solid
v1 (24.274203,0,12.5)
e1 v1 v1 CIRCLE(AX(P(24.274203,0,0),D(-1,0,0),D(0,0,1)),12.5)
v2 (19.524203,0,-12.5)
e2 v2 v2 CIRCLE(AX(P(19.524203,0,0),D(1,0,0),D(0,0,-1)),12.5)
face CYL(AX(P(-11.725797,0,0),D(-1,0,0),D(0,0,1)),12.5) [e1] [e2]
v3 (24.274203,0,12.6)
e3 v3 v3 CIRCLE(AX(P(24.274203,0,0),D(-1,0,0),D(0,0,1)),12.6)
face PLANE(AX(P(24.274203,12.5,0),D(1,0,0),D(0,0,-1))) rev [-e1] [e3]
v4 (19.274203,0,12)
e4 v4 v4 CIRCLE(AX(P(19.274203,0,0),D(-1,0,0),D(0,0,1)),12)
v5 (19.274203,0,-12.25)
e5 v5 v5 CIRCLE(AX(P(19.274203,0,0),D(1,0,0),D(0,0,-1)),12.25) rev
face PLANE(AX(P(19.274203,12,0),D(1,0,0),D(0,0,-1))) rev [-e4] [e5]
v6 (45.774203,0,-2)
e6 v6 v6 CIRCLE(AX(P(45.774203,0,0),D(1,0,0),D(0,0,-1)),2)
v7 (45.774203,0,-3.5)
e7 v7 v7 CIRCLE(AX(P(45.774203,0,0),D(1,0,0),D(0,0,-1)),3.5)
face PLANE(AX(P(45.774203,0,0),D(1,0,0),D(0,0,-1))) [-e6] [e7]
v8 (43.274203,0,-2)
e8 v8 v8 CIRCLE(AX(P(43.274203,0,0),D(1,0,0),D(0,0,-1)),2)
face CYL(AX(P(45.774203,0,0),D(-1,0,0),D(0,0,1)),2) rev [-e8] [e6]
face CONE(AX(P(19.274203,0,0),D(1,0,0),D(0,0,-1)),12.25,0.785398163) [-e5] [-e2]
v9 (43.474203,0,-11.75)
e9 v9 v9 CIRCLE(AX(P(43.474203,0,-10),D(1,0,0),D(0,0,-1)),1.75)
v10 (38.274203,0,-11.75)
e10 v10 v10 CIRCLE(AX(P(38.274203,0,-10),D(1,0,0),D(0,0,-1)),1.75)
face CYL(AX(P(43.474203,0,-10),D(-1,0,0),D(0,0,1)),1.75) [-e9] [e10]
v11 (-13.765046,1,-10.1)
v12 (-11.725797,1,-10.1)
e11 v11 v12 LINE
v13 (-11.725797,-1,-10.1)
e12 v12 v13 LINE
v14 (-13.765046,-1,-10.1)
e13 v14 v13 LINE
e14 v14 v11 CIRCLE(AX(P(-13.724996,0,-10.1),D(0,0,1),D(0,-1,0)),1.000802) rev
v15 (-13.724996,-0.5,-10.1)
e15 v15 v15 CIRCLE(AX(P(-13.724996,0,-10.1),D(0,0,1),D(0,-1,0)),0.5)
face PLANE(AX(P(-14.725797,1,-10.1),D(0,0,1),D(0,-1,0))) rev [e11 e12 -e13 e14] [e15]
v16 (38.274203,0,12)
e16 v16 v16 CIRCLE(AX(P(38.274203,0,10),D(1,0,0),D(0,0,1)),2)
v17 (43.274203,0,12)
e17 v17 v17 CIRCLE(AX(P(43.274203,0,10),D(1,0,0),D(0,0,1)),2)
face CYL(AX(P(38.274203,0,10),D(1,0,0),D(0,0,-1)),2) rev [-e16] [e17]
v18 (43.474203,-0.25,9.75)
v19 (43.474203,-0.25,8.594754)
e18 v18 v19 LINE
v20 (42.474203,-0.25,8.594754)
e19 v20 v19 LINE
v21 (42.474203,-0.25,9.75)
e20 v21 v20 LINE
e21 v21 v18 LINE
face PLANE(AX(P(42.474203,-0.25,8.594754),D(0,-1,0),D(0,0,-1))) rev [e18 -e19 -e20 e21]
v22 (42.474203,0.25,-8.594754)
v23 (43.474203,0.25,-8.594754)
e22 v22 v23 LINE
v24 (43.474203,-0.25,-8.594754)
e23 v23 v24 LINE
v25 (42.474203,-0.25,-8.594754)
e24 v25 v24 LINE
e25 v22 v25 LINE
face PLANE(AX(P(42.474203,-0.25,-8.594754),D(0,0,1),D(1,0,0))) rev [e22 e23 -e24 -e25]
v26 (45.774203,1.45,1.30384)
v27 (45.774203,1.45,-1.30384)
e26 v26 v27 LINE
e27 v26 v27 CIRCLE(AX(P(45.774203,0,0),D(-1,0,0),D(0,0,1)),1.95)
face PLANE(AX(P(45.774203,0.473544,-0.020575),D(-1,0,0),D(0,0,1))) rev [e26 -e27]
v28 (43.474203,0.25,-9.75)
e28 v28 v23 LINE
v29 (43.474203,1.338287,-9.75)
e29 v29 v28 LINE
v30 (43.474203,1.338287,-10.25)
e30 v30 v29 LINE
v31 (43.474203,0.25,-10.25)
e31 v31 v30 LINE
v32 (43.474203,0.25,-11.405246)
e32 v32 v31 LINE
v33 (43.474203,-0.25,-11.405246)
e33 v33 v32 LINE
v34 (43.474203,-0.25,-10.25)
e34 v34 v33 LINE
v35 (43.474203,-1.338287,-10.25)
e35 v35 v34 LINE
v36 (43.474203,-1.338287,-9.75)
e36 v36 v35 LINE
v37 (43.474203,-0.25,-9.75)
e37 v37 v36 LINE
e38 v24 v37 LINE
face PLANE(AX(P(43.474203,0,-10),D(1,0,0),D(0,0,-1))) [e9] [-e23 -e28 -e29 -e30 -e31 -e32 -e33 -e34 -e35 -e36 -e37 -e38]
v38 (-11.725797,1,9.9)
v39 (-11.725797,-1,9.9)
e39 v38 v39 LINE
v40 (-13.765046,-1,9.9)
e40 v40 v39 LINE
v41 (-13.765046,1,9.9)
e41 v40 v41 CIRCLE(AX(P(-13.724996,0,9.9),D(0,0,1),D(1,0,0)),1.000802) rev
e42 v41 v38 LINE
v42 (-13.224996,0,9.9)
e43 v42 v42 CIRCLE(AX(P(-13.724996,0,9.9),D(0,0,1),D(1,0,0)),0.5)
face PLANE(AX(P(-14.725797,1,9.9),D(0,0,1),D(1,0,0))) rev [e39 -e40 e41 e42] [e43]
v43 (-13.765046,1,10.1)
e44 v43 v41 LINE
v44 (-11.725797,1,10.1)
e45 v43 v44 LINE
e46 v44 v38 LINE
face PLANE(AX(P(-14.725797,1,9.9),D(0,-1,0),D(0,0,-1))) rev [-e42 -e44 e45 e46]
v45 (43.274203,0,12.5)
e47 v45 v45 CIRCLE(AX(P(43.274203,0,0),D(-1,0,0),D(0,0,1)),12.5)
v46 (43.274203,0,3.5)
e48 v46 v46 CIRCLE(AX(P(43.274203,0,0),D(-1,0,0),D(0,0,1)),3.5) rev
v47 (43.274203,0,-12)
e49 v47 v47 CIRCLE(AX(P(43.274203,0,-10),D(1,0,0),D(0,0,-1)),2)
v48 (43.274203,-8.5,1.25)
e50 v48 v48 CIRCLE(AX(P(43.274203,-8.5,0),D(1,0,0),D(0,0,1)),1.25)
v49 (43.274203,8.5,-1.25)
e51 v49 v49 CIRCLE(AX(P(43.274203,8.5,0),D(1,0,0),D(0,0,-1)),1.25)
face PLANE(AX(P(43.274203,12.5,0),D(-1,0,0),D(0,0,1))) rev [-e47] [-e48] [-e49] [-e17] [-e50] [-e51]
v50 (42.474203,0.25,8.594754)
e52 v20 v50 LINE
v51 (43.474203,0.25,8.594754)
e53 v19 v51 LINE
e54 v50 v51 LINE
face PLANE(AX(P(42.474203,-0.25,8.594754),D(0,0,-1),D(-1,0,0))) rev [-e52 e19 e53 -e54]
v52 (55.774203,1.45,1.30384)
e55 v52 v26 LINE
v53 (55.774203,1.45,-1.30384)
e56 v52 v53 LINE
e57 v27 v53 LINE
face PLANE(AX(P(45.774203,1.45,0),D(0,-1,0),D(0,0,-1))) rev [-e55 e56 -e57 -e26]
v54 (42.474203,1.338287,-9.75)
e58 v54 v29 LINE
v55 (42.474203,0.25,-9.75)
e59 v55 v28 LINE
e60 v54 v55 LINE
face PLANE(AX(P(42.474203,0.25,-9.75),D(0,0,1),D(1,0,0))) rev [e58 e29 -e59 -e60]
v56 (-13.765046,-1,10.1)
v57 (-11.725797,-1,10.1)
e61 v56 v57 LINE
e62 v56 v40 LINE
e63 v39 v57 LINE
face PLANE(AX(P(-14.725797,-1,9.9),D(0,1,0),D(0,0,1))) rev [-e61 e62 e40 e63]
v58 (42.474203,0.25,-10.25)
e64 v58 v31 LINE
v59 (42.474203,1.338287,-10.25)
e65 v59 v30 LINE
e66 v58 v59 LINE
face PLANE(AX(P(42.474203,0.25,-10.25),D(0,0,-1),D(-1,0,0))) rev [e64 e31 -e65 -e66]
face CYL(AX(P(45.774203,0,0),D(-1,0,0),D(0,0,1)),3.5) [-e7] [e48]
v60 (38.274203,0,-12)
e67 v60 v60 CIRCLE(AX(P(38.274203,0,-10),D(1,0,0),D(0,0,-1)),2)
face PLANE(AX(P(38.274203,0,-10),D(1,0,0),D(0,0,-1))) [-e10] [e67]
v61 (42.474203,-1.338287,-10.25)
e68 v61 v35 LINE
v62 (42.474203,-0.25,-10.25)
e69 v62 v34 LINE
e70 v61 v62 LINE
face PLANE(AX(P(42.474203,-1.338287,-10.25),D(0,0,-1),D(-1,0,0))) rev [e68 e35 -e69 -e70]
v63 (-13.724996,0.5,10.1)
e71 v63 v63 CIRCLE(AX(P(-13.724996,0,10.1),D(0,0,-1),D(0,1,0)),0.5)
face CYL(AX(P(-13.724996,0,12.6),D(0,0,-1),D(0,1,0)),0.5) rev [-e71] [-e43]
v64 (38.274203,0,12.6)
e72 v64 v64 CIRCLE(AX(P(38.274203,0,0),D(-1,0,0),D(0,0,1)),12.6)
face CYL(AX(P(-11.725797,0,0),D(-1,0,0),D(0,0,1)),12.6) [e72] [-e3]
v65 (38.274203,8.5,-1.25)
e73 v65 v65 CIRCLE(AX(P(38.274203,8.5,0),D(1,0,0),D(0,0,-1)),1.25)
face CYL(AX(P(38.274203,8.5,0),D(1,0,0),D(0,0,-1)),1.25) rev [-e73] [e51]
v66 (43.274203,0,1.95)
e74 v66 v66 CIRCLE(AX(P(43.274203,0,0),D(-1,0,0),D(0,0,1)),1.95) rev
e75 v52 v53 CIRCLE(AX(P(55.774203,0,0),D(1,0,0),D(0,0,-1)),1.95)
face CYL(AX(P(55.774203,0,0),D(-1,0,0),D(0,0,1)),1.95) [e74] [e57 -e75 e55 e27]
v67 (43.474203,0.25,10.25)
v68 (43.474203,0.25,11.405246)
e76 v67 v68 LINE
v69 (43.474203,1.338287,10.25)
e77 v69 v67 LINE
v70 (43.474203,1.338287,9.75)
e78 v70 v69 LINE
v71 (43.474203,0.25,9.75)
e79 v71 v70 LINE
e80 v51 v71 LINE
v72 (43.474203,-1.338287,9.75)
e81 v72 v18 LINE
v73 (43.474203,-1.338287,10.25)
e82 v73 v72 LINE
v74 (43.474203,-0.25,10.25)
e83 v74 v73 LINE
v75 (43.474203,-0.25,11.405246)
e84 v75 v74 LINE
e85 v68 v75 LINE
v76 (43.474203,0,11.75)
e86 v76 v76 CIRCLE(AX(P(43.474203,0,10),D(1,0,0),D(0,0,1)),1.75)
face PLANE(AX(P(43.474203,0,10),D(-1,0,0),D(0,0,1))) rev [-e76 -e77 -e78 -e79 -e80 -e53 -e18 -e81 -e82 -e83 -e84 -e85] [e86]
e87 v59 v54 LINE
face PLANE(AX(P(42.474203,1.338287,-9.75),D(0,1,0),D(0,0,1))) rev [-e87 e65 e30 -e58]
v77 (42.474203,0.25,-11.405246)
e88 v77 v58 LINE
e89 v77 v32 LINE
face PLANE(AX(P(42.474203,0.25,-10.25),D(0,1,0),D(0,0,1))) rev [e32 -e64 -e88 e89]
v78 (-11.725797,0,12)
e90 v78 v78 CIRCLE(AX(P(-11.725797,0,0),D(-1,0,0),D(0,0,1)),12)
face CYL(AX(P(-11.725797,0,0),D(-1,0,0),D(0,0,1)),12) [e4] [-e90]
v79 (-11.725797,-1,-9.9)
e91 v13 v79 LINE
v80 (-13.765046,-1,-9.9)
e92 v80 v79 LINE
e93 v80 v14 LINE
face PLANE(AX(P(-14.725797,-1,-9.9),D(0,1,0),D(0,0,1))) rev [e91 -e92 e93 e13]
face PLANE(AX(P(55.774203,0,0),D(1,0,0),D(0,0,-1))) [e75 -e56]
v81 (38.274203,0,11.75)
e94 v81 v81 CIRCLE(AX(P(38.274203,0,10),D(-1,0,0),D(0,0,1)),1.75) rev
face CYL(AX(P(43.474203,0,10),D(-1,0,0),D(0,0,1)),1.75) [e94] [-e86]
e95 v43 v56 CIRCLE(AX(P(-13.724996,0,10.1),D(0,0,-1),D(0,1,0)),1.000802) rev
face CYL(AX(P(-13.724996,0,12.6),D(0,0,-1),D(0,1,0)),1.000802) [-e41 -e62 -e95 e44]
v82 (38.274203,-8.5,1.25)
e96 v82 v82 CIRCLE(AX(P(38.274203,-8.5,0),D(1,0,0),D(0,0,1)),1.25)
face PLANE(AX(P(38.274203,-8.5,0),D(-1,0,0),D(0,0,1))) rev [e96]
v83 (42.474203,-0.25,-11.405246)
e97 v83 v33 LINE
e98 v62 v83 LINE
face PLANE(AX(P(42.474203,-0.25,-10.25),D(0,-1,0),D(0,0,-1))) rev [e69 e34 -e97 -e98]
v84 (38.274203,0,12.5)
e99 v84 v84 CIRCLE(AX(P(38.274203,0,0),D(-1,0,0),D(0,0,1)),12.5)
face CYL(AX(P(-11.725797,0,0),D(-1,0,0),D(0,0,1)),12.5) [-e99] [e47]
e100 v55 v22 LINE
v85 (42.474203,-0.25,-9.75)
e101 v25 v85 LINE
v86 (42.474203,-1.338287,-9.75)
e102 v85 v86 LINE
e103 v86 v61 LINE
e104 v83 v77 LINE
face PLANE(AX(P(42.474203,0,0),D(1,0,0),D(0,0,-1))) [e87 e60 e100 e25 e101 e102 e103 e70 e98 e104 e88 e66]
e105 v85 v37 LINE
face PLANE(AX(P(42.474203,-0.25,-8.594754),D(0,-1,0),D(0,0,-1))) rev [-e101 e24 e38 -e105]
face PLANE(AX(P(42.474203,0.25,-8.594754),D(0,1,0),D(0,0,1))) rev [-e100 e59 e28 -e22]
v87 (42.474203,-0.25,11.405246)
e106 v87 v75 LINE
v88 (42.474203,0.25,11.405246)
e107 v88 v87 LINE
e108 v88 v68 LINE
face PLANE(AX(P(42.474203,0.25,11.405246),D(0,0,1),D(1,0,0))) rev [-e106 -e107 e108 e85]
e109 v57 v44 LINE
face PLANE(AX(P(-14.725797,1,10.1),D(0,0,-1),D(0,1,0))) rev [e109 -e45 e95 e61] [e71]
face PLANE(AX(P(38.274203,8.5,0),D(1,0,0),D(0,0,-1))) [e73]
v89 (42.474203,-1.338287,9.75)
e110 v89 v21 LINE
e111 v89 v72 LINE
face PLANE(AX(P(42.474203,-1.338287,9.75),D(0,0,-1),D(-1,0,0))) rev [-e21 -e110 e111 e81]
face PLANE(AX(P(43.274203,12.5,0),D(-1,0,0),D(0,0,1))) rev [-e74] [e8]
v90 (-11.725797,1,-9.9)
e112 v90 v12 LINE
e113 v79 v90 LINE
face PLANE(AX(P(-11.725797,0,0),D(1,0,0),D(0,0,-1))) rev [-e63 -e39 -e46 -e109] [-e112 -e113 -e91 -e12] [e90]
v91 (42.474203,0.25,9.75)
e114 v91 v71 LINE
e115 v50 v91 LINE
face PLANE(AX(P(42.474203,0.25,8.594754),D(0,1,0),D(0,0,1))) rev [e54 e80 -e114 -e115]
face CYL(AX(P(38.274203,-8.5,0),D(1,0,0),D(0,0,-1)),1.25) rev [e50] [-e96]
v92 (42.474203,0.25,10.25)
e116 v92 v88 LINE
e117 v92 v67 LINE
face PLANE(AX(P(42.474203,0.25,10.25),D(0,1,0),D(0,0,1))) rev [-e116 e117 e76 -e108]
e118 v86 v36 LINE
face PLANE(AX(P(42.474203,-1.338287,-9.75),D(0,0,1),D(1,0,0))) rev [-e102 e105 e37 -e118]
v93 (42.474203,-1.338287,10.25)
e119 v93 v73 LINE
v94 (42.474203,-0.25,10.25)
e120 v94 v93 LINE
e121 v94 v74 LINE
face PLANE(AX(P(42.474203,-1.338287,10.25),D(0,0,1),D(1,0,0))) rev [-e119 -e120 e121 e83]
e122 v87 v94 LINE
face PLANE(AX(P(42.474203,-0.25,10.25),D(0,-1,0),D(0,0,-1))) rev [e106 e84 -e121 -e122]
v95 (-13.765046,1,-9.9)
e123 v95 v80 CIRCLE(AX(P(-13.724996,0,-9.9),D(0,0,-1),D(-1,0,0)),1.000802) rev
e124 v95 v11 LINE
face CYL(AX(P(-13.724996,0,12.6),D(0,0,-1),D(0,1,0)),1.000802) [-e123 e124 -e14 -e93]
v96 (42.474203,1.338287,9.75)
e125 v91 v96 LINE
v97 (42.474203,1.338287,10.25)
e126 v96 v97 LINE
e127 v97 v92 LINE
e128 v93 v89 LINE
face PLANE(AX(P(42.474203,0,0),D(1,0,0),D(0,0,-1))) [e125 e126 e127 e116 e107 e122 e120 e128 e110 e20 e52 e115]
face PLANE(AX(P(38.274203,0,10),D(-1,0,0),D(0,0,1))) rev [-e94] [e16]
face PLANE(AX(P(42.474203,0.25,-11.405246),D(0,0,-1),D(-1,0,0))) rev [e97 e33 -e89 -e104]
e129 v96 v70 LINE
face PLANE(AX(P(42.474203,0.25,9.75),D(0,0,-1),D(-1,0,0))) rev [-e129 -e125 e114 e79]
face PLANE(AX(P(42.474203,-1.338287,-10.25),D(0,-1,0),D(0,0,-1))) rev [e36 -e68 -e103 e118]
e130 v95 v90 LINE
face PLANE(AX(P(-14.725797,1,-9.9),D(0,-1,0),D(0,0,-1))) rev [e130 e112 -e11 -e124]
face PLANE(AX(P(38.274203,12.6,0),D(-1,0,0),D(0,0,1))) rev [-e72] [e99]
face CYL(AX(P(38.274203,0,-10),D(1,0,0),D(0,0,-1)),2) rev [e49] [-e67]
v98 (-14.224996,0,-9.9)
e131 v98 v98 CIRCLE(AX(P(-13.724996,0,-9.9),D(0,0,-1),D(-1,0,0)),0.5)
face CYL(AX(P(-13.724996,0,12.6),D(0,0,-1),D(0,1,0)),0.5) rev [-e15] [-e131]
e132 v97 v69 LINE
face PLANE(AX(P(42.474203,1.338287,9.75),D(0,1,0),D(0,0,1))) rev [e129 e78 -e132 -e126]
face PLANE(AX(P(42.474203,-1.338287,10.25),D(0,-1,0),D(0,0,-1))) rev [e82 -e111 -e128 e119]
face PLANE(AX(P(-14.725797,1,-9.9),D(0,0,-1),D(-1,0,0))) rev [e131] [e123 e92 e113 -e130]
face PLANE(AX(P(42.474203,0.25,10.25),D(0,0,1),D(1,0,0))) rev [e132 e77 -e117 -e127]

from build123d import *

# Parameters (mm, degrees)
SKETCH3_R               = 3.5
SKETCH3_R_2             = 2
BOSS_EXTRUDE1_DEPTH     = 2.5
SKETCH4_R               = 1.95
BOSS_EXTRUDE2_DEPTH     = 12.5
CUT_EXTRUDE1_DEPTH      = 10
CHAMFER1_SIZE           = 0.25
SKETCH6_R               = 2
CUT_EXTRUDE2_DEPTH      = 5
SKETCH7_R               = 1.75
BOSS_EXTRUDE3_DEPTH     = 5.2
CUT_EXTRUDE4_DEPTH      = 1
SKETCH9_R               = 1.25
CUT_EXTRUDE5_DEPTH      = 5
SKETCH11_W              = 0.2
SKETCH11_H              = 2
BOSS_EXTRUDE4_DEPTH     = 3
CUT_EXTRUDE6_START      = -20.2
CUT_EXTRUDE6_DEPTH      = 20.2
CUT_EXTRUDE7_DEPTH      = 62.520823074
CUT_EXTRUDE7_DEPTH_BACK = 62.520823074
SKETCH13_R              = 0.5


# Read off the part's stored shape, not the designer's step: Cut-Extrude6
with BuildPart() as part:
    # Sketch1 → Revolve1 (revolve)
    with BuildSketch(Plane.XY, mode=Mode.PRIVATE) as revolve1_sk:
        Polygon((-11.725797436, 0), (-11.725797436, 12), (19.274202564, 12), (19.274202564, 12.5), (24.274202564, 12.5), (24.274202564, 12.6), (38.274202564, 12.6), (38.274202564, 12.5), (43.274202564, 12.5), (43.274202564, 0), align=None)
    revolve(revolve1_sk.sketch.rotate(Axis((-11.725797436, 0, 0), (1, 0, 0)), 90), axis=Axis((-11.725797436, 0, 0), (1, 0, 0)))

    # Sketch3 → Boss-Extrude1 (add)
    with BuildSketch(Plane(origin=(43.274202564, 0, 0), x_dir=(0, 0, -1), z_dir=(1, 0, 0))):
        with Locations(Location((0, 0, 0), (0, 0, 180))):
            Circle(SKETCH3_R)
        Circle(SKETCH3_R_2, mode=Mode.SUBTRACT)
    extrude(amount=BOSS_EXTRUDE1_DEPTH)

    # Sketch4 → Boss-Extrude2 (add)
    with BuildSketch(Plane(origin=(43.274202564, 0, 0), x_dir=(0, 0, -1), z_dir=(1, 0, 0))):
        with Locations(Location((0, 0, 0), (0, 0, 180))):
            Circle(SKETCH4_R)
    extrude(amount=BOSS_EXTRUDE2_DEPTH)

    # Sketch5 → Cut-Extrude1 (cut)
    with BuildSketch(Plane(origin=(55.774202564, 0, 0), x_dir=(0, 0, -1), z_dir=(1, 0, 0))):
        with BuildLine():
            Line((0, 1.45), (1.563854219, 1.45))
            ThreePointArc((1.563854219, 1.45), (0.020575485, 2.299790468), (-1.52270325, 1.45))
            Line((-1.52270325, 1.45), (0, 1.45))
        make_face()
    extrude(amount=-CUT_EXTRUDE1_DEPTH, mode=Mode.SUBTRACT)

    # Chamfer1
    chamfer1_edges = [part.edges().sort_by_distance(p)[0] for p in [
        (19.274202564, 0, -12.5),
    ]]
    chamfer(chamfer1_edges, length=CHAMFER1_SIZE)

    # Sketch6 → Cut-Extrude2 (cut)
    with BuildSketch(Plane(origin=(43.274202564, 0, 0), x_dir=(0, 0, -1), z_dir=(1, 0, 0))):
        with Locations((10, 0)):
            Circle(SKETCH6_R)
        with Locations(Location((-10, 0, 0), (0, 0, 180))):
            Circle(SKETCH6_R)
    extrude(amount=-CUT_EXTRUDE2_DEPTH, mode=Mode.SUBTRACT)

    # Sketch7 → Boss-Extrude3 (add)
    with BuildSketch(Plane(origin=(38.274202564, 0, 0), x_dir=(0, 0, -1), z_dir=(1, 0, 0))):
        with Locations((10, 0)):
            Circle(SKETCH7_R)
        with Locations(Location((-10, 0, 0), (0, 0, 180))):
            Circle(SKETCH7_R)
    extrude(amount=BOSS_EXTRUDE3_DEPTH)

    # Sketch8 → Cut-Extrude4 (cut)
    with BuildSketch(Plane(origin=(43.474202564, 0, 0), x_dir=(0, 0, -1), z_dir=(1, 0, 0))):
        Polygon((8.594754122, -0.25), (8.594754122, 0.25), (9.75, 0.25), (9.75, 1.338286548), (10.25, 1.338286548), (10.25, 0.25), (11.405245878, 0.25), (11.405245878, -0.25), (10.25, -0.25), (10.25, -1.338286548), (9.75, -1.338286548), (9.75, -0.25), align=None)
        Polygon((-10.25, -0.25), (-11.405245878, -0.25), (-11.405245878, 0.25), (-10.25, 0.25), (-10.25, 1.338286548), (-9.75, 1.338286548), (-9.75, 0.25), (-8.594754122, 0.25), (-8.594754122, -0.25), (-9.75, -0.25), (-9.75, -1.338286548), (-10.25, -1.338286548), align=None)
    extrude(amount=-CUT_EXTRUDE4_DEPTH, mode=Mode.SUBTRACT)

    # Sketch9 → Cut-Extrude5 (cut)
    with BuildSketch(Plane(origin=(43.274202564, 0, 0), x_dir=(0, 0, -1), z_dir=(1, 0, 0))):
        with Locations((0, 8.5)):
            Circle(SKETCH9_R)
        with Locations(Location((0, -8.5, 0), (0, 0, 180))):
            Circle(SKETCH9_R)
    extrude(amount=-CUT_EXTRUDE5_DEPTH, mode=Mode.SUBTRACT)

    # Sketch11 → Boss-Extrude4 (add)
    with BuildSketch(Plane.ZY.offset(11.725797436)):
        with Locations((10, 0)):
            Rectangle(SKETCH11_W, SKETCH11_H)
        with Locations((-10, 0)):
            Rectangle(SKETCH11_W, SKETCH11_H)
    extrude(amount=BOSS_EXTRUDE4_DEPTH)

    # Cut-Extrude6 outline → Cut-Extrude6 (cut)
    with BuildSketch(Plane(origin=(0, 0, -10.1), x_dir=(-1, 0, 0), z_dir=(0, 0, -1)).offset(CUT_EXTRUDE6_START)):
        with BuildLine():
            ThreePointArc((13.765046185, 1), (14.446690478, 0.693369124), (14.725797436, 0))
            Line((14.725797436, 0), (14.725797436, 1))
            Line((14.725797436, 1), (13.765046185, 1))
        make_face()
        with BuildLine():
            ThreePointArc((14.725797436, 0), (14.446690478, -0.693369124), (13.765046185, -1))
            Line((13.765046185, -1), (14.725797436, -1))
            Line((14.725797436, -1), (14.725797436, 0))
        make_face()
    extrude(amount=CUT_EXTRUDE6_DEPTH, mode=Mode.SUBTRACT)

    # Sketch13 → Cut-Extrude7 (cut, two sides: drawn at the far end of the back side and taken through both)
    with BuildSketch(Plane(origin=(0, 0, -10.1), x_dir=(-1, 0, 0), z_dir=(0, 0, -1)).offset(-CUT_EXTRUDE7_DEPTH_BACK)):
        with Locations((13.724995738, 0)):
            Circle(SKETCH13_R)
    extrude(amount=CUT_EXTRUDE7_DEPTH + CUT_EXTRUDE7_DEPTH_BACK, mode=Mode.SUBTRACT)


solid = part.part
